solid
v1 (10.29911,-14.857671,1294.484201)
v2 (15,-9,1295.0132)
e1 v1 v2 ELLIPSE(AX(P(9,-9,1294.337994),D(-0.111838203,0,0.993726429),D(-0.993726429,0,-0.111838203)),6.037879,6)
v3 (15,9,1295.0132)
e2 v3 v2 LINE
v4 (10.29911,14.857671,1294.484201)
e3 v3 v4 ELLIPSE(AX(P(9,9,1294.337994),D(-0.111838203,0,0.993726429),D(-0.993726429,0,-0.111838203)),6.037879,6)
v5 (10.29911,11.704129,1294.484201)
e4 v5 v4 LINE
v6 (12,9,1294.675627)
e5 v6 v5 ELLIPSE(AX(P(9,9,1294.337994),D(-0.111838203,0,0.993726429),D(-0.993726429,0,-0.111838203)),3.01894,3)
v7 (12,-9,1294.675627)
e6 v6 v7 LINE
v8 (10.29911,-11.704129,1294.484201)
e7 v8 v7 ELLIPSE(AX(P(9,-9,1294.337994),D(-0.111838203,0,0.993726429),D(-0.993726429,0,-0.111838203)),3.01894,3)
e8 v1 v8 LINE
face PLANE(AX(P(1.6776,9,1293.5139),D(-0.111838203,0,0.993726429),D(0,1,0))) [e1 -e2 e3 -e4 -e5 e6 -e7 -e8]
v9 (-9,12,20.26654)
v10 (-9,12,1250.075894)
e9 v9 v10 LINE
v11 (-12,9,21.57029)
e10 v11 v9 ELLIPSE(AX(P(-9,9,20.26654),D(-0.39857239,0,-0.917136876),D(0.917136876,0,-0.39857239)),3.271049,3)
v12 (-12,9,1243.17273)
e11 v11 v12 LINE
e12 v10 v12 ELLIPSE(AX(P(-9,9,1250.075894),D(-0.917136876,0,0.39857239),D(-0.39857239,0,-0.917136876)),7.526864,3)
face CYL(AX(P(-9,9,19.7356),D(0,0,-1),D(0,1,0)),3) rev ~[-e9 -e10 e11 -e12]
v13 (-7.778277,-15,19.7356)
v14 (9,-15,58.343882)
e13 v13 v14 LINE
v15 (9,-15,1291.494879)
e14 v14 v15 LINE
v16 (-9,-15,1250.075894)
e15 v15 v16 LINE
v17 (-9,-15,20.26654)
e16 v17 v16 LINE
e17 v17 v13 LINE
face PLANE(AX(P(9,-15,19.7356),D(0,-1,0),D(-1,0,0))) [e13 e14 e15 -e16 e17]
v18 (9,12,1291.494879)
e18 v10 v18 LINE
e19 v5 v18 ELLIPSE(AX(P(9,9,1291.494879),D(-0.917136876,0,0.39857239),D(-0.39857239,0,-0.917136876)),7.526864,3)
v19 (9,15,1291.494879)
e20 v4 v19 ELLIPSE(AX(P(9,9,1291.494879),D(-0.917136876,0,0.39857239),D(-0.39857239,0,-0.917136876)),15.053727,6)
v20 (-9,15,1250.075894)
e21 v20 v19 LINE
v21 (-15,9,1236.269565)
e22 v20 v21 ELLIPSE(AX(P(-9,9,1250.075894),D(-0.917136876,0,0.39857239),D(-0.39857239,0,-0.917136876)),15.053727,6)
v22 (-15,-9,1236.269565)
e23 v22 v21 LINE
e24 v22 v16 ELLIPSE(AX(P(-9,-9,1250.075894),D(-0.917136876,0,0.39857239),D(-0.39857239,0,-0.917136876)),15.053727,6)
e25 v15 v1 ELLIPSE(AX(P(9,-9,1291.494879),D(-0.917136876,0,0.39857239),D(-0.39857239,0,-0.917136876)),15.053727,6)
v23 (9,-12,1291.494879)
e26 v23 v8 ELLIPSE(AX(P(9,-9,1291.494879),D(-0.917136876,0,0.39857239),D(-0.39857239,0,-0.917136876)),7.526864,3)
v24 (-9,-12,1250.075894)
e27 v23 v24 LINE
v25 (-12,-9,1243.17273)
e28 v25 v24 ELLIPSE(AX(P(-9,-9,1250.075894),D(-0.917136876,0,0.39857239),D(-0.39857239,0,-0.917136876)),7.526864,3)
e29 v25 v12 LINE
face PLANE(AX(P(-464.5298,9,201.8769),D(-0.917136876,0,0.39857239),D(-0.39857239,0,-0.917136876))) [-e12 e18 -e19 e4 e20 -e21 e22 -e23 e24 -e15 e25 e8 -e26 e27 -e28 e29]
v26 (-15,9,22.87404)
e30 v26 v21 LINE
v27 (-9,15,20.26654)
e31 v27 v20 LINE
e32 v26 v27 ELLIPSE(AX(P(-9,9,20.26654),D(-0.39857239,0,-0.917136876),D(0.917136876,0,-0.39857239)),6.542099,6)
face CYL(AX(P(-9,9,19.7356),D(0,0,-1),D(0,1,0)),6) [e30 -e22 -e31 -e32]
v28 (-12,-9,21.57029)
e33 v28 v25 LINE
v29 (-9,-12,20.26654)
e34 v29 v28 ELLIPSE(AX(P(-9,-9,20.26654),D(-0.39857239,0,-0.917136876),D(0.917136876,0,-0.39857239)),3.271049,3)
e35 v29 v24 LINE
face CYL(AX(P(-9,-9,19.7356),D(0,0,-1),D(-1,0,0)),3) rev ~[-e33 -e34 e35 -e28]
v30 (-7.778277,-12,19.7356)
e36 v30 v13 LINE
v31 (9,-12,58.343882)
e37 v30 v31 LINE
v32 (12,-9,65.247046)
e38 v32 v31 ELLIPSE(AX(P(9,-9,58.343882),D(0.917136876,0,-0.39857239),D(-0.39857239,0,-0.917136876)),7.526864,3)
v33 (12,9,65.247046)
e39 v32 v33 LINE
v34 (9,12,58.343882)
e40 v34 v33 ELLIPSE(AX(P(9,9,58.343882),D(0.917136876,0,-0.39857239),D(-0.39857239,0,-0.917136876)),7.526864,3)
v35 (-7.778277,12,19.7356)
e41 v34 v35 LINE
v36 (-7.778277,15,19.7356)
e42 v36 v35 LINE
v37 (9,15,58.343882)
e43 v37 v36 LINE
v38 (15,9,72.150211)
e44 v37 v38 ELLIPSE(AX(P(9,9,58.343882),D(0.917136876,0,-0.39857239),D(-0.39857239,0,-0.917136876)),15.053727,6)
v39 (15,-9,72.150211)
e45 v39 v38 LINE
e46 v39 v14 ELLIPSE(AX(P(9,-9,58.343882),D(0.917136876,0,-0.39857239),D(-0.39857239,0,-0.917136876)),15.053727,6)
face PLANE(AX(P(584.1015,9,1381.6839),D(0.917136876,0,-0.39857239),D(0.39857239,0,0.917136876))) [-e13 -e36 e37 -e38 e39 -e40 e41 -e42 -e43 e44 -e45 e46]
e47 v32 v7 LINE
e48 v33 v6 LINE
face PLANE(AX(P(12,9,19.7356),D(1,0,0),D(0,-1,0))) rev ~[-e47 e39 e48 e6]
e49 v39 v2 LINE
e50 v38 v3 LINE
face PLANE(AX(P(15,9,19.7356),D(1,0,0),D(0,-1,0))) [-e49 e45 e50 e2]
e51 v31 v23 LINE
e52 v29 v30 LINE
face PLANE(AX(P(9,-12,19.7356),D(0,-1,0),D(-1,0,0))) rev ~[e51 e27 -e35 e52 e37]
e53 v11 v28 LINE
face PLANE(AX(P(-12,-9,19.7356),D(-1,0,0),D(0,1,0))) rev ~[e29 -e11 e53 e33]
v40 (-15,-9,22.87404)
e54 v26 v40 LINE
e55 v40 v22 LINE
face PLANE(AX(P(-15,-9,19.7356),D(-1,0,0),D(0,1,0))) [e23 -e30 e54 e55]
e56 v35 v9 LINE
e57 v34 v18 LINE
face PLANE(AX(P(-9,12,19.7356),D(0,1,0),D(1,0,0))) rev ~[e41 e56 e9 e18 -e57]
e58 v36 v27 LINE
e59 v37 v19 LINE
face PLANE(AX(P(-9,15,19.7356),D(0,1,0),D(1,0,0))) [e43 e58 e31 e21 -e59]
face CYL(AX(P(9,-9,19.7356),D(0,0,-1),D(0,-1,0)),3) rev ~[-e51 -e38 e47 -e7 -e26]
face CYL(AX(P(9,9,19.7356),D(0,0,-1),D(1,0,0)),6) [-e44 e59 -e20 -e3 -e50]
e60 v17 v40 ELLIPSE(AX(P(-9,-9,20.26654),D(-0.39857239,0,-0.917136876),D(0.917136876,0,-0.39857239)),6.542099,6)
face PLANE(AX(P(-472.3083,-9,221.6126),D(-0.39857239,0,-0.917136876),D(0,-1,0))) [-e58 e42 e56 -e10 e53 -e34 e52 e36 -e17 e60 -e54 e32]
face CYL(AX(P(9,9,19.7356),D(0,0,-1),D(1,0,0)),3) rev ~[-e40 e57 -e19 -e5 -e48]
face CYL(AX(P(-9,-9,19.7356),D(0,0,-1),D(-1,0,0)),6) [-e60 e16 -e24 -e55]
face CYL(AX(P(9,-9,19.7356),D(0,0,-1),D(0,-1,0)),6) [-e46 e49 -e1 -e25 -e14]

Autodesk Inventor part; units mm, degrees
ref_plane "Start Plane" through (0, 0, 19.7356) normal (0, 0, 1) x (1, 0, 0)
ref_plane "End Plane" through (0, 0, 1295.0132) normal (0, 0, 1) x (1, 0, 0)
sketch "Sketch" plane through (0, 0, 0) normal (0, 0, 1) x (1, 0, 0)
  line L0 (-15, -9) -> (-15, 9)
  line L1 (-9, 15) -> (9, 15)
  line L2 (15, 9) -> (15, -9)
  line L3 (9, -15) -> (-9, -15)
  arc A0 (-15, -9) -> (-9, -15) centre (-9, -9) ccw
  arc A1 (-9, 15) -> (-15, 9) centre (-9, 9) ccw
  arc A2 (15, 9) -> (9, 15) centre (9, 9) ccw
  arc A3 (9, -15) -> (15, -9) centre (9, -9) ccw
  arc A4 (-9, 12) -> (-12, 9) centre (-9, 9) ccw
  line L4 (-9, 12) -> (9, 12)
  arc A5 (12, 9) -> (9, 12) centre (9, 9) ccw
  line L5 (12, 9) -> (12, -9)
  arc A6 (9, -12) -> (12, -9) centre (9, -9) ccw
  line L6 (9, -12) -> (-9, -12)
  arc A7 (-12, -9) -> (-9, -12) centre (-9, -9) ccw
  line L7 (-12, -9) -> (-12, 9)
  line L8 (0, 22.7397) -> (0, -22.7397) construction
  line L9 (-22.7397, 0) -> (22.7397, 0) construction
  dimension "d7" = 6
  dimension "d10" = 30
  dimension "d11" = 30
  dimension "d12" = 3
  dimension "d15" = 15
  dimension "d16" = 15
extrude "Body" add sketch "Sketch" along normal up to surface (1275.2776 mm away) from surface at 19.7356
sketch "Sketch3" plane through (0, 0, 0) normal (0, 0, 1) x (1, 0, 0)
  line L0 (0, 0) -> (10, 0)
ref_plane "Work Plane3" through (0, 0, 0) normal (0, -1, 0) x (1, 0, 0)
ref_plane "Work Plane4" through (-472.3083, -9, 221.6126) normal (-0.3985724, 0, -0.9171369) x (-0.9171369, 0, 0.3985724)
split "Split1" plane through (-472.3083, -9, 221.6126) removes the side toward (-0.3985724, 0, -0.9171369)
ref_plane "Work Plane5" through (-464.5298, 9, 201.8769) normal (-0.9171369, 0, 0.3985724) x (0.3985724, 0, 0.9171369)
split "Split2" plane through (-464.5298, 9, 201.8769) removes the side toward (-0.9171369, 0, 0.3985724)
ref_plane "Work Plane6" through (1.6776, 9, 1293.5139) normal (-0.1118382, 0, 0.9937264) x (0.9937264, 0, 0.1118382)
split "Split3" plane through (1.6776, 9, 1293.5139) removes the side toward (-0.1118382, 0, 0.9937264)
ref_plane "Work Plane7" through (584.1015, 9, 1381.6839) normal (0.9171369, 0, -0.3985724) x (-0.3985724, 0, -0.9171369)
split "Split4" plane through (584.1015, 9, 1381.6839) removes the side toward (0.9171369, 0, -0.3985724)
sketch "Sketch4" plane through (0, 0, 0) normal (0, -1, 0) x (1, 0, 0)
  line L0 (-2, 19.7356) -> (12, 19.7356) projected
  line L1 (-2, 1295.0132) -> (12, 1295.0132) projected
  dimension "d18" = 1275.2776
equation "\"d7\" = G_IR"
equation "\"d10\" = G_H"
equation "\"d11\" = G_W"
equation "\"d12\" = G_T"
equation "\"d15\" = 0.5 * d10"
equation "\"d16\" = 0.5 * d11"
equation "\"d3\" = G_L"
equation "\"G_W\" = 30"
equation "\"G_H\" = 30"
equation "\"G_T\" = 3"
equation "\"G_IR\" = 6"
equation "\"G_L\" = d18"
equation "\"G_OFFSET_START\" = -19.73564"
equation "\"G_OFFSET_END\" = -13.40653"
equation "\"d13\" = -G_OFFSET_START"
equation "\"d14\" = G_OFFSET_END + B_L"
equation "\"B_L\" = 1308.41975"
properties part number "DIN EN 10219-2 - 30 x 30 x 3  - 1275.28" material "Steel, Mild"
